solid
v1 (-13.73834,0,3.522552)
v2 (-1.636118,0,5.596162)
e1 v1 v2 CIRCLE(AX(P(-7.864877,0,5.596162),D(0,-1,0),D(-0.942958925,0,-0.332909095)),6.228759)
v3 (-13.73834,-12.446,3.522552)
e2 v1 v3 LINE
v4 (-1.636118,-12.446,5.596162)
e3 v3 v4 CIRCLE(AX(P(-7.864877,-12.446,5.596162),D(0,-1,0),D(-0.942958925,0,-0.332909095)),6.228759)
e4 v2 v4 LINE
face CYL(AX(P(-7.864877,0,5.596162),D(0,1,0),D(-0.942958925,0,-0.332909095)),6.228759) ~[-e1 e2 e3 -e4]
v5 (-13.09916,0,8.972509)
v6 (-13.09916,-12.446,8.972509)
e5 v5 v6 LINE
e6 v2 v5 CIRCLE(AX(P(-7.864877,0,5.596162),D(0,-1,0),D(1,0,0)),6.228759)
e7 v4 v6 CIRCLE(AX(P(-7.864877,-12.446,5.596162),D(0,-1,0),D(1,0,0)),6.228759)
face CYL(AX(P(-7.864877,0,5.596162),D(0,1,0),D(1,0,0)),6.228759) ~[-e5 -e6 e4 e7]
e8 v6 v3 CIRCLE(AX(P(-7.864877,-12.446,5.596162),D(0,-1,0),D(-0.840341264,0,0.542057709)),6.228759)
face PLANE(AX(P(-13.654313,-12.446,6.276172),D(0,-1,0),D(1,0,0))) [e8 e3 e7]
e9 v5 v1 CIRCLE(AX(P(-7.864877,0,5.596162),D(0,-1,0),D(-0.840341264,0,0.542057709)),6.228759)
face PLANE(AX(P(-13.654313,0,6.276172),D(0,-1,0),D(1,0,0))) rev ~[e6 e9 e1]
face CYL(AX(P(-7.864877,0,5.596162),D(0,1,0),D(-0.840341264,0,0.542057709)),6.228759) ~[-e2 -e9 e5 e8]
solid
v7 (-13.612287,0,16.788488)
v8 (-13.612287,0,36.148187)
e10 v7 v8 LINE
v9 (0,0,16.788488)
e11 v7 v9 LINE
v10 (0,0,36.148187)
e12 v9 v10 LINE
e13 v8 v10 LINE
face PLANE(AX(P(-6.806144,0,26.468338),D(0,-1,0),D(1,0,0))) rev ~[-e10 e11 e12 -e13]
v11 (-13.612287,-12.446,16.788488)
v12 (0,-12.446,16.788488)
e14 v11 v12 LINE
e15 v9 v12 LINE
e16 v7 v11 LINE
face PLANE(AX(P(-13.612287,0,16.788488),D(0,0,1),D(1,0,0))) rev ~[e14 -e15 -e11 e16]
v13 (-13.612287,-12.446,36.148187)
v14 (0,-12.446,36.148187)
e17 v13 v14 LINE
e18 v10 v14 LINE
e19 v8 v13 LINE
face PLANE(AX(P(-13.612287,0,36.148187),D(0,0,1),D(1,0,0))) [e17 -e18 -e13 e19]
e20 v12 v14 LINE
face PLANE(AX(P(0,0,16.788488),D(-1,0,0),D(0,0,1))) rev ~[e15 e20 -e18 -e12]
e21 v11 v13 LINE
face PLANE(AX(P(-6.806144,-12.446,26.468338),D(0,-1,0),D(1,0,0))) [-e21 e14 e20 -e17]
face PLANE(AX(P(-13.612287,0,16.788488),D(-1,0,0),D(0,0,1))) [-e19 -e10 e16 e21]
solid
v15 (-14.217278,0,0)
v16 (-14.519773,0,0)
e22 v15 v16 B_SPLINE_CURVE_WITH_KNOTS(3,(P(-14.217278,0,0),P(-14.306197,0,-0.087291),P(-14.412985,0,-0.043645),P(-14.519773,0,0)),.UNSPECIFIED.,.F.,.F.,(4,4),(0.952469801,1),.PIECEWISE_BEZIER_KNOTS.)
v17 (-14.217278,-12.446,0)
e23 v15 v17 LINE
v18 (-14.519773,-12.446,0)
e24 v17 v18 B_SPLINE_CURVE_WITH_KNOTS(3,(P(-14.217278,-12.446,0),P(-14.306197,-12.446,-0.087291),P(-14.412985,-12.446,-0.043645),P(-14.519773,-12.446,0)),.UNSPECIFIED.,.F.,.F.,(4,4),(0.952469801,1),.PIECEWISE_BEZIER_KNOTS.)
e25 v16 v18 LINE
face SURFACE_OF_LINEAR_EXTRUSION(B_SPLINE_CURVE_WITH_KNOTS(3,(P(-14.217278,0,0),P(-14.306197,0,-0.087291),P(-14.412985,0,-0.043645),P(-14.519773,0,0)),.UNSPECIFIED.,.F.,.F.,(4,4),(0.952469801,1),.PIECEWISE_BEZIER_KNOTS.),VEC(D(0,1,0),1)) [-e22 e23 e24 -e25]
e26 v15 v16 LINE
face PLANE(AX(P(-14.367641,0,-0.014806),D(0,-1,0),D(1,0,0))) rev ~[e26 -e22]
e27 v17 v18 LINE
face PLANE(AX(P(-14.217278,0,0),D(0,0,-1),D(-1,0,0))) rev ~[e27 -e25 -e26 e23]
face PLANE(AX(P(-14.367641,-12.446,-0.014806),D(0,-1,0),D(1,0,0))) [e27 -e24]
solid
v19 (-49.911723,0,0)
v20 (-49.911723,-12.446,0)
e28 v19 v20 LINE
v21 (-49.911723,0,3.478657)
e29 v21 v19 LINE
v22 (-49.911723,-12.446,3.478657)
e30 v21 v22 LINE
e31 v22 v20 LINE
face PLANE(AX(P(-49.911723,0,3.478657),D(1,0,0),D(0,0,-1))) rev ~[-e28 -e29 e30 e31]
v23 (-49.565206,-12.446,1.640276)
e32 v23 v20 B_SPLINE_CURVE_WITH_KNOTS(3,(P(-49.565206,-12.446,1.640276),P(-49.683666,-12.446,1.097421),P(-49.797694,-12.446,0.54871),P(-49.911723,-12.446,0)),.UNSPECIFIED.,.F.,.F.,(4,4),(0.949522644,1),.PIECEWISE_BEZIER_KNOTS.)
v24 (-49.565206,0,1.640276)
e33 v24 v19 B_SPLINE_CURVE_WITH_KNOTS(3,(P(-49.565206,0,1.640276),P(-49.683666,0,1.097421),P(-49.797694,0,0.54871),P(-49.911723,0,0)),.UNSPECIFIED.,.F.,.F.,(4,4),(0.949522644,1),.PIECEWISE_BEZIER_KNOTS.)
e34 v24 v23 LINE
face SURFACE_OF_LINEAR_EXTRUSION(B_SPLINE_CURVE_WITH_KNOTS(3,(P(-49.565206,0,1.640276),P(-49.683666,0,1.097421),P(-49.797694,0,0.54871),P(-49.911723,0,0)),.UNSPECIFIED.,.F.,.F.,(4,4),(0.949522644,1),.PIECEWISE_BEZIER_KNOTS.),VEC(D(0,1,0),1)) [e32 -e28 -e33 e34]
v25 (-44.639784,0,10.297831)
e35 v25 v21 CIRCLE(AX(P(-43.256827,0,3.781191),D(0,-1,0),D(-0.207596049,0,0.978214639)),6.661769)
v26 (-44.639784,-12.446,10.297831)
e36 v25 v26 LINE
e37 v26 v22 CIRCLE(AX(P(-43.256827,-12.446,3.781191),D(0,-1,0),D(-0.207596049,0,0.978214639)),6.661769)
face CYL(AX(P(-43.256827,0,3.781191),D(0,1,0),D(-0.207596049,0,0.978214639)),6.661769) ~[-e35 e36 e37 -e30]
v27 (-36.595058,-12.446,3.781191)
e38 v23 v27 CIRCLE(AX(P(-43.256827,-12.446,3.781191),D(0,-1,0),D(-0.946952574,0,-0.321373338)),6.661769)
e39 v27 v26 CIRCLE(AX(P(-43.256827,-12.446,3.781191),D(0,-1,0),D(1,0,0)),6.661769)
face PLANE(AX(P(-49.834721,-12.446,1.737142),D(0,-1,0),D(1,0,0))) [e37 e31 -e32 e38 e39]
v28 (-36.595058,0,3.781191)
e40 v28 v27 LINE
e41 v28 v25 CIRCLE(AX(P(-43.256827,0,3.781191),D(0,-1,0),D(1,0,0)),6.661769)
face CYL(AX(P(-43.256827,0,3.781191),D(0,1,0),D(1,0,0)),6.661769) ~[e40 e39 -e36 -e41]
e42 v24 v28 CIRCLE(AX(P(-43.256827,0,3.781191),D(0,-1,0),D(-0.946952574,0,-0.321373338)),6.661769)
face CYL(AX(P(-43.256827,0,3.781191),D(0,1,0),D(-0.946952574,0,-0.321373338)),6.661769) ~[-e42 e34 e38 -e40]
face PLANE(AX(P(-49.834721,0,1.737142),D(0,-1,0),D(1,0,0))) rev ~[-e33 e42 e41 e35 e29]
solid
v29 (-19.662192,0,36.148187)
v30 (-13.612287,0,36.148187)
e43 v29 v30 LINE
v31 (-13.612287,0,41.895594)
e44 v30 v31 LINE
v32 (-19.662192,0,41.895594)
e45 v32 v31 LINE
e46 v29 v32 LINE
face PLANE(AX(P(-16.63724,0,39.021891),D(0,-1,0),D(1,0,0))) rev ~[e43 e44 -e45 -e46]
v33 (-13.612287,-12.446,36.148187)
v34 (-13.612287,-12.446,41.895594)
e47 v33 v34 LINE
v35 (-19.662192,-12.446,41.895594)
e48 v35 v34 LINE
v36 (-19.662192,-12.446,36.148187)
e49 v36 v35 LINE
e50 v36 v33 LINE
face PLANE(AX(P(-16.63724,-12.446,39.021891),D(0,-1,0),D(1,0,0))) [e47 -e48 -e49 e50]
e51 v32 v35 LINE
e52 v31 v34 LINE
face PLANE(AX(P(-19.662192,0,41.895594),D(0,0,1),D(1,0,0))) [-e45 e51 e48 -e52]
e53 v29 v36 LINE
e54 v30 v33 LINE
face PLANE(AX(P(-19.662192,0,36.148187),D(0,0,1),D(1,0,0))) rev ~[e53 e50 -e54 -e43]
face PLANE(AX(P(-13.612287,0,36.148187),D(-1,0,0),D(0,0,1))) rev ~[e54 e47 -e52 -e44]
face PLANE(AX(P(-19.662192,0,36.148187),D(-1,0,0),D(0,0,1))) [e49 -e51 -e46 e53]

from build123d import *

# Parameters (mm, degrees)
F1_DEPTH = 12.446
F0_W     = 6.0499049723
F0_H     = 5.7474076748
F0_W_2   = 13.612287119
F0_H_2   = 19.3596985191


with BuildPart() as f1:
    # F0 (on Front) → F1 (new body)
    with BuildSketch(Plane.XZ):
        with BuildLine():
            Line((-49.9117225409, 3.4786572239), (-49.9117225409, 0))
            add(Edge.make_bspline(
                [(-49.5652059441, 1.6402761529), (-49.6836660494, 1.09742076), (-49.7976942951, 0.54871038), (-49.9117225409, 0)],
                knots=[0.9495226435, 0.9495226435, 0.9495226435, 0.9495226435, 1, 1, 1, 1], degree=3))
            ThreePointArc((-49.5652059441, 1.6402761529), (-49.8033170935, 2.5472425692), (-49.9117225409, 3.4786572239))
        make_face()
        with BuildLine():
            ThreePointArc((-49.9117225409, 4.0837249228), (-49.918595638, 3.7811910734), (-49.9117225409, 3.4786572239))
            Line((-49.9117225409, 3.4786572239), (-49.9117225409, 4.0837249228))
        make_face()
        with BuildLine():
            Line((-49.9117225409, 4.0837249228), (-49.9117225409, 3.4786572239))
            ThreePointArc((-49.9117225409, 3.4786572239), (-49.8033170935, 2.5472425692), (-49.5652059441, 1.6402761529))
            add(Edge.make_bspline(
                [(-44.6397836083, 10.2978309733), (-45.119653972, 10.1041501862), (-47.8014157398, 8.582874138), (-48.8523363966, 4.9070728269), (-49.5652059441, 1.6402761529)],
                knots=[0.584004576, 0.584004576, 0.584004576, 0.584004576, 0.6457598692, 0.9495226435, 0.9495226435, 0.9495226435, 0.9495226435], degree=3))
            ThreePointArc((-44.6397836083, 10.2978309733), (-48.3367428118, 8.090903092), (-49.9117225409, 4.0837249228))
        make_face()
        with BuildLine():
            add(Edge.make_bspline(
                [(-44.6397836083, 10.2978309733), (-45.119653972, 10.1041501862), (-47.8014157398, 8.582874138), (-48.8523363966, 4.9070728269), (-49.5652059441, 1.6402761529)],
                knots=[0.584004576, 0.584004576, 0.584004576, 0.584004576, 0.6457598692, 0.9495226435, 0.9495226435, 0.9495226435, 0.9495226435], degree=3))
            ThreePointArc((-49.5652059441, 1.6402761529), (-42.171884192, -2.7916367166), (-36.5950577596, 3.7811910734))
            ThreePointArc((-36.5950577596, 3.7811910734), (-39.0636044286, 8.957681428), (-44.6397836083, 10.2978309733))
        make_face()
    extrude(amount=F1_DEPTH)


with BuildPart() as f1b:
    # F0 (on Front) → F1, piece 2 (new body)
    with BuildSketch(Plane.XZ):
        with Locations((-16.6372396052, 39.0218906105)):
            Rectangle(F0_W, F0_H)
    extrude(amount=F1_DEPTH)


with BuildPart() as f1c:
    # F0 (on Front) → F1, piece 3 (new body)
    with BuildSketch(Plane.XZ):
        with BuildLine():
            Line((-14.2172779888, 0), (-14.5197734237, 0))
            add(Edge.make_bspline(
                [(-14.2172779888, 0), (-14.3061968444, -0.0872909317), (-14.412985134, -0.0436454659), (-14.5197734237, 0)],
                knots=[0.952469801, 0.952469801, 0.952469801, 0.952469801, 1, 1, 1, 1], degree=3))
        make_face()
    extrude(amount=F1_DEPTH)


with BuildPart() as f1d:
    # F0 (on Front) → F1, piece 4 (new body)
    with BuildSketch(Plane.XZ):
        with Locations((-6.8061435595, 26.4683375135)):
            Rectangle(F0_W_2, F0_H_2)
    extrude(amount=F1_DEPTH)


with BuildPart() as f1e:
    # F0 (on Front) → F1, piece 5 (new body)
    with BuildSketch(Plane.XZ):
        with BuildLine():
            ThreePointArc((-13.0991596694, 8.9725089924), (-14.0512340104, 6.3217092663), (-13.7383403252, 3.5225518431))
            add(Edge.make_bspline(
                [(-13.0991596694, 8.9725089924), (-13.4021570242, 7.995667339), (-13.5891754167, 6.2309110491), (-13.6990528868, 4.2034320829), (-13.7383403252, 3.5225518431)],
                knots=[0.6405219867, 0.6405219867, 0.6405219867, 0.6405219867, 0.7474400174, 0.8053833563, 0.8053833563, 0.8053833563, 0.8053833563], degree=3))
        make_face()
        with BuildLine():
            add(Edge.make_bspline(
                [(-13.0991596694, 8.9725089924), (-13.4021570242, 7.995667339), (-13.5891754167, 6.2309110491), (-13.6990528868, 4.2034320829), (-13.7383403252, 3.5225518431)],
                knots=[0.6405219867, 0.6405219867, 0.6405219867, 0.6405219867, 0.7474400174, 0.8053833563, 0.8053833563, 0.8053833563, 0.8053833563], degree=3))
            ThreePointArc((-13.7383403252, 3.5225518431), (-6.8129623392, -0.5431301891), (-1.6361178808, 5.5961622857))
            ThreePointArc((-1.6361178808, 5.5961622857), (-6.1049974568, 11.5711318281), (-13.0991596694, 8.9725089924))
        make_face()
    extrude(amount=F1_DEPTH)


solid = Compound([f1.part, f1b.part, f1c.part, f1d.part, f1e.part])
